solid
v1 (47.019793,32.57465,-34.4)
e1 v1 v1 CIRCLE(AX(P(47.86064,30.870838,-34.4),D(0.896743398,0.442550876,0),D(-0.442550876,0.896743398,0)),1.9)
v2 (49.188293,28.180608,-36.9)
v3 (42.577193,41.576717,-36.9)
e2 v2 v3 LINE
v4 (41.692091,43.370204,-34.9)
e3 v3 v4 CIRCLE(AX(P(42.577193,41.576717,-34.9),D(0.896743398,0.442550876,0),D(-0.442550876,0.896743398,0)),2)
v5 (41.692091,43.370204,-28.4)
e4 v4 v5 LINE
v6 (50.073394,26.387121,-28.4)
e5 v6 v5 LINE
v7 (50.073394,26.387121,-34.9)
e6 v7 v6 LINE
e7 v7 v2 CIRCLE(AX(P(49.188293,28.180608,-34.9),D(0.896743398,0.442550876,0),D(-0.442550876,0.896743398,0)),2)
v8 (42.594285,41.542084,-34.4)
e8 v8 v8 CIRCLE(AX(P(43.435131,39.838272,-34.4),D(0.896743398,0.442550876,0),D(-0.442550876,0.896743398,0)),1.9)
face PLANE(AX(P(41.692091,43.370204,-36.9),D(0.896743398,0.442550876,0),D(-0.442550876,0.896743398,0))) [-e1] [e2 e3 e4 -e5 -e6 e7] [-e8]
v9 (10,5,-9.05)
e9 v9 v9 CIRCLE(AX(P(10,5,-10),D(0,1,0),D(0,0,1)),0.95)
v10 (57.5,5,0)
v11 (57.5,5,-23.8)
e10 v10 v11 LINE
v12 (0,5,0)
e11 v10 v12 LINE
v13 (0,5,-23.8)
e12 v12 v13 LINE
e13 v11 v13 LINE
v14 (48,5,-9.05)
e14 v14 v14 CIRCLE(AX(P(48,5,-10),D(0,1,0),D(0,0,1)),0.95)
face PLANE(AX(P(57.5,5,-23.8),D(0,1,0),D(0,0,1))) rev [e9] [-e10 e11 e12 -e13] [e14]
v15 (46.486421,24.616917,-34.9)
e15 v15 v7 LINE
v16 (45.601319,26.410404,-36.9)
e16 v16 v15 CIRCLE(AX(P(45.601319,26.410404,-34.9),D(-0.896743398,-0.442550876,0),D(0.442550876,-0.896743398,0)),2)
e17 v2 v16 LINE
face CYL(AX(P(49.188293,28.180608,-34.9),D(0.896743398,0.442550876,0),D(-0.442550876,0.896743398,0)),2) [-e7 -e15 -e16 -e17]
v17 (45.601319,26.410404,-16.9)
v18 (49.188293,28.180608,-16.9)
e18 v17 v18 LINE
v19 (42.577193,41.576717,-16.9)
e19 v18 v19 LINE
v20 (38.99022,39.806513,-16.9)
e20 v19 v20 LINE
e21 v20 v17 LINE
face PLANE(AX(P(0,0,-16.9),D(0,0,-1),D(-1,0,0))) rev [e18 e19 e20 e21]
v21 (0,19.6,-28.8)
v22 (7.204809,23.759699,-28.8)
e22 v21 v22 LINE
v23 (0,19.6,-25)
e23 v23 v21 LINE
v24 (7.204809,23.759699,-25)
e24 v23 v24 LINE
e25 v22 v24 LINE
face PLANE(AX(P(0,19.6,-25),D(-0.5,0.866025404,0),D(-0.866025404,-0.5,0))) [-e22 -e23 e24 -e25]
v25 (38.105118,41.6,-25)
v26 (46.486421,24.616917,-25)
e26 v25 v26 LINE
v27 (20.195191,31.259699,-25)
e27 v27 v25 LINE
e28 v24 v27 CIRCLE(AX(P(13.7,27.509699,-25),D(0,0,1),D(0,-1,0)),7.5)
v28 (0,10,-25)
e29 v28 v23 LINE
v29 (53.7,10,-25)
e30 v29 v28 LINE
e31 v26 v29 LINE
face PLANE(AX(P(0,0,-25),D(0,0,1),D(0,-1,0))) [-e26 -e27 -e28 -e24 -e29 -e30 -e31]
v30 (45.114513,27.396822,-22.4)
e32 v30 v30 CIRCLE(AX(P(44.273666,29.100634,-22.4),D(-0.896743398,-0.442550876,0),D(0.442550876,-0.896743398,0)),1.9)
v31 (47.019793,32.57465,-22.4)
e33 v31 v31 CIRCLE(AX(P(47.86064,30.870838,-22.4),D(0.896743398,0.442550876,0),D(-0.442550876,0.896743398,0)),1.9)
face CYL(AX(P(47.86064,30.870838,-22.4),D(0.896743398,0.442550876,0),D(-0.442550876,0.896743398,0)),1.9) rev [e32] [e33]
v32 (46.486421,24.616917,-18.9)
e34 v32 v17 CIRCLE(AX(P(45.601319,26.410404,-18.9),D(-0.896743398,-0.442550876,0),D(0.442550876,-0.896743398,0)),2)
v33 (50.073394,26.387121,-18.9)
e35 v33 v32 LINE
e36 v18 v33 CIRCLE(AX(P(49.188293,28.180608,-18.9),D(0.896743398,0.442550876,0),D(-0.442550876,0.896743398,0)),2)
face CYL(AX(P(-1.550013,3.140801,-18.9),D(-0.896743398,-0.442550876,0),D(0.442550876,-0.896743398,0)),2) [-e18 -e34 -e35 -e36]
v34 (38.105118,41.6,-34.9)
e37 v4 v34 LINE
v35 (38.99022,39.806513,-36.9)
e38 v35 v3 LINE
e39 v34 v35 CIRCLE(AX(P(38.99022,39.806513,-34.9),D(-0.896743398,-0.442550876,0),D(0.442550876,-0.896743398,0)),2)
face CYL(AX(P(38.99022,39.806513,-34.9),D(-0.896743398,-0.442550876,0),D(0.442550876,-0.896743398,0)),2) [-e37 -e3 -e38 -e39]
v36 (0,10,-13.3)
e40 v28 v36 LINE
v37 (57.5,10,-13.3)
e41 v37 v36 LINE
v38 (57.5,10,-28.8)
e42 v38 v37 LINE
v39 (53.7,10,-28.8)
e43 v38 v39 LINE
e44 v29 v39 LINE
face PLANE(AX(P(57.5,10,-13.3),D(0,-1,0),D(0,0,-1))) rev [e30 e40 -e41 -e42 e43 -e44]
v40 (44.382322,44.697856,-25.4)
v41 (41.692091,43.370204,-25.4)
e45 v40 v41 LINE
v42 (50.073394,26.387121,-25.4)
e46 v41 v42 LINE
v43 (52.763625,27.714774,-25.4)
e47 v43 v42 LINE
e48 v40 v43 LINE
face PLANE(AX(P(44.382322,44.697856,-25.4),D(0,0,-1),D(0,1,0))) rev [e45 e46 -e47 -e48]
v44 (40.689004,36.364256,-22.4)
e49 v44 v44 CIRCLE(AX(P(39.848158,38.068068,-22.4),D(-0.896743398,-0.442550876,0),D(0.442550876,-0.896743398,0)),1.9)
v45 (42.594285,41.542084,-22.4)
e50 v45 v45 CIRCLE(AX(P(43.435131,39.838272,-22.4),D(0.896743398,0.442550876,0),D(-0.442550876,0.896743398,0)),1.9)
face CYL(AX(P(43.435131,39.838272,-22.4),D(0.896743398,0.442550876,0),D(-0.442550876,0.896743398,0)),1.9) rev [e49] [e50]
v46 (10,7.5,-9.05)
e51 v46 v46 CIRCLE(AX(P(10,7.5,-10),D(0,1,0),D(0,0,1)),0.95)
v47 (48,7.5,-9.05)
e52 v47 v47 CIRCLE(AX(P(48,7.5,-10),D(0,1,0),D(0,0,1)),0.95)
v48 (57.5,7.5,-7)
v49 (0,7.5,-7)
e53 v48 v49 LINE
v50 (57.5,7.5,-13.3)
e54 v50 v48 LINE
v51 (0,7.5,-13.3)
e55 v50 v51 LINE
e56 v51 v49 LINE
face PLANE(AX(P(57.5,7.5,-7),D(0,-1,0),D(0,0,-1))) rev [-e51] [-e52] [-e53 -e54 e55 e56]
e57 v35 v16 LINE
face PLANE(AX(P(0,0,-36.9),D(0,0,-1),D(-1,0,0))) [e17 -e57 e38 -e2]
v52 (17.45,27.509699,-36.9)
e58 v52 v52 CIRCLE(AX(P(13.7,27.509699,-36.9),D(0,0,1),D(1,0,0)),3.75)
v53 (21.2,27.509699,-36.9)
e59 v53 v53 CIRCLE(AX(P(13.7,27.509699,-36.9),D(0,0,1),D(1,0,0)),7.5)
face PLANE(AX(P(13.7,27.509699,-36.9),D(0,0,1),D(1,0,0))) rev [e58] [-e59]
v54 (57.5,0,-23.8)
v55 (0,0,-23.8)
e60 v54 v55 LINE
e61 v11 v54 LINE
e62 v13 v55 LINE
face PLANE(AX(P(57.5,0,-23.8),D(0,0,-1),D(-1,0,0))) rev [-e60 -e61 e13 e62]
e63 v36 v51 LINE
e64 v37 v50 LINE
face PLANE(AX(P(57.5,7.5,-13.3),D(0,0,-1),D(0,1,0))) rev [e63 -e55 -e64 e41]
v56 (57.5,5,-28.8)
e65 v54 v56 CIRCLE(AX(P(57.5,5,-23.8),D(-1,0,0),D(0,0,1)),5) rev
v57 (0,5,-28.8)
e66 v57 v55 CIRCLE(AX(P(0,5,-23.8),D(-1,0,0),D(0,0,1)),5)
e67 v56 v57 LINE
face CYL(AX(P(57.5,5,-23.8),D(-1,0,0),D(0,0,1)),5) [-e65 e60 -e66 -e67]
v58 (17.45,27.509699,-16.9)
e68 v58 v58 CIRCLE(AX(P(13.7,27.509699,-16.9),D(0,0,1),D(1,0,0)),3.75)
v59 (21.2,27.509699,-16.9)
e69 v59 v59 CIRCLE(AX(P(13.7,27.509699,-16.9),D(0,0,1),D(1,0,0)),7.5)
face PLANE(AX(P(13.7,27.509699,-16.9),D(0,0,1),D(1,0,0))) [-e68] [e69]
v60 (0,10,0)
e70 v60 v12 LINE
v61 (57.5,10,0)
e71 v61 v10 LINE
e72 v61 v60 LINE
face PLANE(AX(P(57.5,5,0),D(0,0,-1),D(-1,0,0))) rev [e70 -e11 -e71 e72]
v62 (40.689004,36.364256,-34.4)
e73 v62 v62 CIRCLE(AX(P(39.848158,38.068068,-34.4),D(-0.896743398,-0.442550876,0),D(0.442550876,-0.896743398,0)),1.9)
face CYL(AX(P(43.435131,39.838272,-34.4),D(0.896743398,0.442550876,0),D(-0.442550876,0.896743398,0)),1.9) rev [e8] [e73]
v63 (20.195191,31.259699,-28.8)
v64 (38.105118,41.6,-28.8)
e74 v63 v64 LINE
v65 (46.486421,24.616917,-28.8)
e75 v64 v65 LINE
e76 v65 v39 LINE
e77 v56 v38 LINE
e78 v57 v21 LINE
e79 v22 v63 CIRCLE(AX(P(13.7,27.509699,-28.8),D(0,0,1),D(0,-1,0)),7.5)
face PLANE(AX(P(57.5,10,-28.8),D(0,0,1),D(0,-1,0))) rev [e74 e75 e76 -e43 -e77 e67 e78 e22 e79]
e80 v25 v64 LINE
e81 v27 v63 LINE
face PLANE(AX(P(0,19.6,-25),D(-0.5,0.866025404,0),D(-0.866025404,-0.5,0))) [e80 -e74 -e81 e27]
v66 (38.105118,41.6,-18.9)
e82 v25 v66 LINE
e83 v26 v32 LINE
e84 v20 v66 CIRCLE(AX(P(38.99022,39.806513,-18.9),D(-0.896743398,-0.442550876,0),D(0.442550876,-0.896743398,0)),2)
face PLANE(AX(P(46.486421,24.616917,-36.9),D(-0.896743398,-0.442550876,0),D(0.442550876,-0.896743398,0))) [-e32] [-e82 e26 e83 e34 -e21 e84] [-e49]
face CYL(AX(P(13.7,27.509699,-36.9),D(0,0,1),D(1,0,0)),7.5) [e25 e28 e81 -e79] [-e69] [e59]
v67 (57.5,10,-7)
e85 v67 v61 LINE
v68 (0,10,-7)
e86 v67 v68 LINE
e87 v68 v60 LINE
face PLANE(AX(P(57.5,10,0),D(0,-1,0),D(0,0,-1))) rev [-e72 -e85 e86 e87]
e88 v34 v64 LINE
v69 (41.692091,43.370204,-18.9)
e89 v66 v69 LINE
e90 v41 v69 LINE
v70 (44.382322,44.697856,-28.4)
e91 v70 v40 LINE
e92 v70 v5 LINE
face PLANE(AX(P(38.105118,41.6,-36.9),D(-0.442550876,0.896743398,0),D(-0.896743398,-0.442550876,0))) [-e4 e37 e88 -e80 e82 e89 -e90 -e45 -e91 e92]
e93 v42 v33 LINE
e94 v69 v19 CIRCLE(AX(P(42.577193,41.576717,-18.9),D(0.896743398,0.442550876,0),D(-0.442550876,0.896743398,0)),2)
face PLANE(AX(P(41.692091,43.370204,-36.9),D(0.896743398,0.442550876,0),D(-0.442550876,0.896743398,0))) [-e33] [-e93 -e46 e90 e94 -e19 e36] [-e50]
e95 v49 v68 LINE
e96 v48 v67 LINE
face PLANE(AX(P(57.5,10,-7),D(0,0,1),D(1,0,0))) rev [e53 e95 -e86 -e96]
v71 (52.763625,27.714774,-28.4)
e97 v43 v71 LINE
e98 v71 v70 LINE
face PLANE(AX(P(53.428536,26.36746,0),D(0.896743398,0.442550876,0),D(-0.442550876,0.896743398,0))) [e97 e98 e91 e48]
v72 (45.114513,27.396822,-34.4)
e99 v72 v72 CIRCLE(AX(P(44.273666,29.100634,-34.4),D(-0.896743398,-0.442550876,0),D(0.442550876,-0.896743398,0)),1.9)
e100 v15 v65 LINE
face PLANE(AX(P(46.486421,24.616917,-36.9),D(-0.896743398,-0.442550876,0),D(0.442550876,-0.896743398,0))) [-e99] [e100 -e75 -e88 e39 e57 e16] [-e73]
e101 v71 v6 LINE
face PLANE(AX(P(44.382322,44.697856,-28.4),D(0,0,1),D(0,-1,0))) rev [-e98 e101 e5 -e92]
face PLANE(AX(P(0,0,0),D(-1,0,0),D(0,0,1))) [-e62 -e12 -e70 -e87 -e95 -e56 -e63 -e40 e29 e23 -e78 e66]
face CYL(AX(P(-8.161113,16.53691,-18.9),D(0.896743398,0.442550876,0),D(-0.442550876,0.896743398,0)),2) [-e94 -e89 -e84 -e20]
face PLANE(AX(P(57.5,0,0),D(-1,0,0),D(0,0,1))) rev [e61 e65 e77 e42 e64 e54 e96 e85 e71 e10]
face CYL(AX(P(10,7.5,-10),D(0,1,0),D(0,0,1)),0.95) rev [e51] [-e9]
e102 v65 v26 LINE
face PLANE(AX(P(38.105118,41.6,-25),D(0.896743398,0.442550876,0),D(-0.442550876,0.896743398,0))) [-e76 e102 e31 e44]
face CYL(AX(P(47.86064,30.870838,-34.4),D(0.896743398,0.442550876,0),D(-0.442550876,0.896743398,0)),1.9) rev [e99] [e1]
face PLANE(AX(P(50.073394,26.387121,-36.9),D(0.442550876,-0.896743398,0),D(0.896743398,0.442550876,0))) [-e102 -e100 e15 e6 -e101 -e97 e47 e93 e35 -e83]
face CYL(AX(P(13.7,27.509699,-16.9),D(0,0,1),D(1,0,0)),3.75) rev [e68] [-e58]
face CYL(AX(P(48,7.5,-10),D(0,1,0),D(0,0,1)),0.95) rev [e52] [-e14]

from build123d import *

# Parameters (mm, degrees)
BOSS_EXTRUDE1_DEPTH      = 57.5
FILLET1_R                = 5
BOSS_EXTRUDE2_DEPTH      = 3.8
BOSS_EXTRUDE3_DEPTH      = 8.1
BOSS_EXTRUDE3_DEPTH_BACK = 11.9
SKETCH3_R                = 7.5
HOLE1_D                  = 7.5
BOSS_EXTRUDE4_DEPTH      = 8.1
BOSS_EXTRUDE4_DEPTH_BACK = 11.9
SKETCH7_W                = 3
SKETCH7_H                = 18.938620175
BOSS_EXTRUDE5_DEPTH      = 3
HOLE2_D                  = 3.8
HOLE2_DEPTH              = 4
FILLET2_R                = 2
HOLE3_D                  = 1.9
LPATTERN1_COUNT          = 2
LPATTERN1_PITCH          = 38


with BuildPart() as part:
    # Sketch1 → Boss-Extrude1 (new body)
    with BuildSketch(Plane(origin=(0, 0, 0), x_dir=(0, 0, -1), z_dir=(1, 0, 0))):
        Polygon((0, 5), (0, 10), (7, 10), (7, 7.5), (13.3, 7.5), (13.3, 10), (28.8, 10), (28.8, 0), (23.8, 0), (23.8, 5), align=None)
    extrude(amount=BOSS_EXTRUDE1_DEPTH)

    # Fillet1
    fillet1_edges = [part.edges().sort_by_distance(p)[0] for p in [
        (28.75, 0, -28.8),
    ]]
    fillet(fillet1_edges, radius=FILLET1_R - 0.0001)  # a hair under: the kernel refuses the full size

    # Sketch2 → Boss-Extrude2 (add)
    with BuildSketch(Plane(origin=(0, 0, -28.8), x_dir=(-1, 0, 0), z_dir=(0, 0, -1))):
        Polygon((-53.7, 10), (0, 10), (0, 19.6), (-38.105117767, 41.6), align=None)
    extrude(amount=-BOSS_EXTRUDE2_DEPTH)

    # Sketch3 → Boss-Extrude3 (add, two sides: drawn at the far end of the back side and taken through both)
    with BuildSketch(Plane.XY.offset(-25).offset(-BOSS_EXTRUDE3_DEPTH_BACK)):
        with Locations((13.7, 27.509698688)):
            Circle(SKETCH3_R)
    extrude(amount=BOSS_EXTRUDE3_DEPTH + BOSS_EXTRUDE3_DEPTH_BACK)

    # Hole1 (through all)
    with Locations(Plane.XY.offset(-16.9)):
        with Locations((13.7, 27.509698688)):
            Hole(HOLE1_D / 2)

    # Sketch6 → Boss-Extrude4 (add, two sides: drawn at the far end of the back side and taken through both)
    with BuildSketch(Plane.XY.offset(-25).offset(-BOSS_EXTRUDE4_DEPTH_BACK)):
        Polygon((38.105117767, 41.6), (41.692091359, 43.370203505), (50.073394311, 26.387120893), (46.486420719, 24.616917389), align=None)
    extrude(amount=BOSS_EXTRUDE4_DEPTH + BOSS_EXTRUDE4_DEPTH_BACK)

    # Sketch7 → Boss-Extrude5 (add)
    with BuildSketch(Plane(origin=(50.738305729, 25.039807043, 0), x_dir=(0, 0, -1), z_dir=(0.8967433980837525, 0.44255087616363914, 0))):
        with Locations((26.9, 10.971762018)):
            Rectangle(SKETCH7_W, SKETCH7_H)
    extrude(amount=BOSS_EXTRUDE5_DEPTH)

    # Hole2
    with Locations(Plane(origin=(50.738305729, 25.039807043, 0), x_dir=(0, 0, -1), z_dir=(0.8967433980837525, 0.44255087616363914, 0))):
        with Locations((34.4, 6.502451931), (22.4, 6.502451931), (22.4, 16.502451931), (34.4, 16.502451931)):
            Hole(HOLE2_D / 2, depth=HOLE2_DEPTH)

    # Fillet2
    fillet2_edges = [part.edges().sort_by_distance(p)[0] for p in [
        (39.898604563, 42.485101752, -36.9),
        (48.279907515, 25.502019141, -36.9),
        (48.279907515, 25.502019141, -16.9),
        (39.898604563, 42.485101752, -16.9),
    ]]
    fillet(fillet2_edges, radius=FILLET2_R)

    # Hole3 (through all)
    with Locations(Plane(origin=(0, 7.5, 0), x_dir=(1, 0, 0), z_dir=(0, 1, 0))):
        with Locations((10, 10)):
            hole3 = Hole(HOLE3_D / 2)

    # LPattern1: Hole3 ×2
    with Locations(*[(i * LPATTERN1_PITCH, 0, 0) for i in range(1, LPATTERN1_COUNT)]):
        add(hole3, mode=Mode.SUBTRACT)


solid = part.part
